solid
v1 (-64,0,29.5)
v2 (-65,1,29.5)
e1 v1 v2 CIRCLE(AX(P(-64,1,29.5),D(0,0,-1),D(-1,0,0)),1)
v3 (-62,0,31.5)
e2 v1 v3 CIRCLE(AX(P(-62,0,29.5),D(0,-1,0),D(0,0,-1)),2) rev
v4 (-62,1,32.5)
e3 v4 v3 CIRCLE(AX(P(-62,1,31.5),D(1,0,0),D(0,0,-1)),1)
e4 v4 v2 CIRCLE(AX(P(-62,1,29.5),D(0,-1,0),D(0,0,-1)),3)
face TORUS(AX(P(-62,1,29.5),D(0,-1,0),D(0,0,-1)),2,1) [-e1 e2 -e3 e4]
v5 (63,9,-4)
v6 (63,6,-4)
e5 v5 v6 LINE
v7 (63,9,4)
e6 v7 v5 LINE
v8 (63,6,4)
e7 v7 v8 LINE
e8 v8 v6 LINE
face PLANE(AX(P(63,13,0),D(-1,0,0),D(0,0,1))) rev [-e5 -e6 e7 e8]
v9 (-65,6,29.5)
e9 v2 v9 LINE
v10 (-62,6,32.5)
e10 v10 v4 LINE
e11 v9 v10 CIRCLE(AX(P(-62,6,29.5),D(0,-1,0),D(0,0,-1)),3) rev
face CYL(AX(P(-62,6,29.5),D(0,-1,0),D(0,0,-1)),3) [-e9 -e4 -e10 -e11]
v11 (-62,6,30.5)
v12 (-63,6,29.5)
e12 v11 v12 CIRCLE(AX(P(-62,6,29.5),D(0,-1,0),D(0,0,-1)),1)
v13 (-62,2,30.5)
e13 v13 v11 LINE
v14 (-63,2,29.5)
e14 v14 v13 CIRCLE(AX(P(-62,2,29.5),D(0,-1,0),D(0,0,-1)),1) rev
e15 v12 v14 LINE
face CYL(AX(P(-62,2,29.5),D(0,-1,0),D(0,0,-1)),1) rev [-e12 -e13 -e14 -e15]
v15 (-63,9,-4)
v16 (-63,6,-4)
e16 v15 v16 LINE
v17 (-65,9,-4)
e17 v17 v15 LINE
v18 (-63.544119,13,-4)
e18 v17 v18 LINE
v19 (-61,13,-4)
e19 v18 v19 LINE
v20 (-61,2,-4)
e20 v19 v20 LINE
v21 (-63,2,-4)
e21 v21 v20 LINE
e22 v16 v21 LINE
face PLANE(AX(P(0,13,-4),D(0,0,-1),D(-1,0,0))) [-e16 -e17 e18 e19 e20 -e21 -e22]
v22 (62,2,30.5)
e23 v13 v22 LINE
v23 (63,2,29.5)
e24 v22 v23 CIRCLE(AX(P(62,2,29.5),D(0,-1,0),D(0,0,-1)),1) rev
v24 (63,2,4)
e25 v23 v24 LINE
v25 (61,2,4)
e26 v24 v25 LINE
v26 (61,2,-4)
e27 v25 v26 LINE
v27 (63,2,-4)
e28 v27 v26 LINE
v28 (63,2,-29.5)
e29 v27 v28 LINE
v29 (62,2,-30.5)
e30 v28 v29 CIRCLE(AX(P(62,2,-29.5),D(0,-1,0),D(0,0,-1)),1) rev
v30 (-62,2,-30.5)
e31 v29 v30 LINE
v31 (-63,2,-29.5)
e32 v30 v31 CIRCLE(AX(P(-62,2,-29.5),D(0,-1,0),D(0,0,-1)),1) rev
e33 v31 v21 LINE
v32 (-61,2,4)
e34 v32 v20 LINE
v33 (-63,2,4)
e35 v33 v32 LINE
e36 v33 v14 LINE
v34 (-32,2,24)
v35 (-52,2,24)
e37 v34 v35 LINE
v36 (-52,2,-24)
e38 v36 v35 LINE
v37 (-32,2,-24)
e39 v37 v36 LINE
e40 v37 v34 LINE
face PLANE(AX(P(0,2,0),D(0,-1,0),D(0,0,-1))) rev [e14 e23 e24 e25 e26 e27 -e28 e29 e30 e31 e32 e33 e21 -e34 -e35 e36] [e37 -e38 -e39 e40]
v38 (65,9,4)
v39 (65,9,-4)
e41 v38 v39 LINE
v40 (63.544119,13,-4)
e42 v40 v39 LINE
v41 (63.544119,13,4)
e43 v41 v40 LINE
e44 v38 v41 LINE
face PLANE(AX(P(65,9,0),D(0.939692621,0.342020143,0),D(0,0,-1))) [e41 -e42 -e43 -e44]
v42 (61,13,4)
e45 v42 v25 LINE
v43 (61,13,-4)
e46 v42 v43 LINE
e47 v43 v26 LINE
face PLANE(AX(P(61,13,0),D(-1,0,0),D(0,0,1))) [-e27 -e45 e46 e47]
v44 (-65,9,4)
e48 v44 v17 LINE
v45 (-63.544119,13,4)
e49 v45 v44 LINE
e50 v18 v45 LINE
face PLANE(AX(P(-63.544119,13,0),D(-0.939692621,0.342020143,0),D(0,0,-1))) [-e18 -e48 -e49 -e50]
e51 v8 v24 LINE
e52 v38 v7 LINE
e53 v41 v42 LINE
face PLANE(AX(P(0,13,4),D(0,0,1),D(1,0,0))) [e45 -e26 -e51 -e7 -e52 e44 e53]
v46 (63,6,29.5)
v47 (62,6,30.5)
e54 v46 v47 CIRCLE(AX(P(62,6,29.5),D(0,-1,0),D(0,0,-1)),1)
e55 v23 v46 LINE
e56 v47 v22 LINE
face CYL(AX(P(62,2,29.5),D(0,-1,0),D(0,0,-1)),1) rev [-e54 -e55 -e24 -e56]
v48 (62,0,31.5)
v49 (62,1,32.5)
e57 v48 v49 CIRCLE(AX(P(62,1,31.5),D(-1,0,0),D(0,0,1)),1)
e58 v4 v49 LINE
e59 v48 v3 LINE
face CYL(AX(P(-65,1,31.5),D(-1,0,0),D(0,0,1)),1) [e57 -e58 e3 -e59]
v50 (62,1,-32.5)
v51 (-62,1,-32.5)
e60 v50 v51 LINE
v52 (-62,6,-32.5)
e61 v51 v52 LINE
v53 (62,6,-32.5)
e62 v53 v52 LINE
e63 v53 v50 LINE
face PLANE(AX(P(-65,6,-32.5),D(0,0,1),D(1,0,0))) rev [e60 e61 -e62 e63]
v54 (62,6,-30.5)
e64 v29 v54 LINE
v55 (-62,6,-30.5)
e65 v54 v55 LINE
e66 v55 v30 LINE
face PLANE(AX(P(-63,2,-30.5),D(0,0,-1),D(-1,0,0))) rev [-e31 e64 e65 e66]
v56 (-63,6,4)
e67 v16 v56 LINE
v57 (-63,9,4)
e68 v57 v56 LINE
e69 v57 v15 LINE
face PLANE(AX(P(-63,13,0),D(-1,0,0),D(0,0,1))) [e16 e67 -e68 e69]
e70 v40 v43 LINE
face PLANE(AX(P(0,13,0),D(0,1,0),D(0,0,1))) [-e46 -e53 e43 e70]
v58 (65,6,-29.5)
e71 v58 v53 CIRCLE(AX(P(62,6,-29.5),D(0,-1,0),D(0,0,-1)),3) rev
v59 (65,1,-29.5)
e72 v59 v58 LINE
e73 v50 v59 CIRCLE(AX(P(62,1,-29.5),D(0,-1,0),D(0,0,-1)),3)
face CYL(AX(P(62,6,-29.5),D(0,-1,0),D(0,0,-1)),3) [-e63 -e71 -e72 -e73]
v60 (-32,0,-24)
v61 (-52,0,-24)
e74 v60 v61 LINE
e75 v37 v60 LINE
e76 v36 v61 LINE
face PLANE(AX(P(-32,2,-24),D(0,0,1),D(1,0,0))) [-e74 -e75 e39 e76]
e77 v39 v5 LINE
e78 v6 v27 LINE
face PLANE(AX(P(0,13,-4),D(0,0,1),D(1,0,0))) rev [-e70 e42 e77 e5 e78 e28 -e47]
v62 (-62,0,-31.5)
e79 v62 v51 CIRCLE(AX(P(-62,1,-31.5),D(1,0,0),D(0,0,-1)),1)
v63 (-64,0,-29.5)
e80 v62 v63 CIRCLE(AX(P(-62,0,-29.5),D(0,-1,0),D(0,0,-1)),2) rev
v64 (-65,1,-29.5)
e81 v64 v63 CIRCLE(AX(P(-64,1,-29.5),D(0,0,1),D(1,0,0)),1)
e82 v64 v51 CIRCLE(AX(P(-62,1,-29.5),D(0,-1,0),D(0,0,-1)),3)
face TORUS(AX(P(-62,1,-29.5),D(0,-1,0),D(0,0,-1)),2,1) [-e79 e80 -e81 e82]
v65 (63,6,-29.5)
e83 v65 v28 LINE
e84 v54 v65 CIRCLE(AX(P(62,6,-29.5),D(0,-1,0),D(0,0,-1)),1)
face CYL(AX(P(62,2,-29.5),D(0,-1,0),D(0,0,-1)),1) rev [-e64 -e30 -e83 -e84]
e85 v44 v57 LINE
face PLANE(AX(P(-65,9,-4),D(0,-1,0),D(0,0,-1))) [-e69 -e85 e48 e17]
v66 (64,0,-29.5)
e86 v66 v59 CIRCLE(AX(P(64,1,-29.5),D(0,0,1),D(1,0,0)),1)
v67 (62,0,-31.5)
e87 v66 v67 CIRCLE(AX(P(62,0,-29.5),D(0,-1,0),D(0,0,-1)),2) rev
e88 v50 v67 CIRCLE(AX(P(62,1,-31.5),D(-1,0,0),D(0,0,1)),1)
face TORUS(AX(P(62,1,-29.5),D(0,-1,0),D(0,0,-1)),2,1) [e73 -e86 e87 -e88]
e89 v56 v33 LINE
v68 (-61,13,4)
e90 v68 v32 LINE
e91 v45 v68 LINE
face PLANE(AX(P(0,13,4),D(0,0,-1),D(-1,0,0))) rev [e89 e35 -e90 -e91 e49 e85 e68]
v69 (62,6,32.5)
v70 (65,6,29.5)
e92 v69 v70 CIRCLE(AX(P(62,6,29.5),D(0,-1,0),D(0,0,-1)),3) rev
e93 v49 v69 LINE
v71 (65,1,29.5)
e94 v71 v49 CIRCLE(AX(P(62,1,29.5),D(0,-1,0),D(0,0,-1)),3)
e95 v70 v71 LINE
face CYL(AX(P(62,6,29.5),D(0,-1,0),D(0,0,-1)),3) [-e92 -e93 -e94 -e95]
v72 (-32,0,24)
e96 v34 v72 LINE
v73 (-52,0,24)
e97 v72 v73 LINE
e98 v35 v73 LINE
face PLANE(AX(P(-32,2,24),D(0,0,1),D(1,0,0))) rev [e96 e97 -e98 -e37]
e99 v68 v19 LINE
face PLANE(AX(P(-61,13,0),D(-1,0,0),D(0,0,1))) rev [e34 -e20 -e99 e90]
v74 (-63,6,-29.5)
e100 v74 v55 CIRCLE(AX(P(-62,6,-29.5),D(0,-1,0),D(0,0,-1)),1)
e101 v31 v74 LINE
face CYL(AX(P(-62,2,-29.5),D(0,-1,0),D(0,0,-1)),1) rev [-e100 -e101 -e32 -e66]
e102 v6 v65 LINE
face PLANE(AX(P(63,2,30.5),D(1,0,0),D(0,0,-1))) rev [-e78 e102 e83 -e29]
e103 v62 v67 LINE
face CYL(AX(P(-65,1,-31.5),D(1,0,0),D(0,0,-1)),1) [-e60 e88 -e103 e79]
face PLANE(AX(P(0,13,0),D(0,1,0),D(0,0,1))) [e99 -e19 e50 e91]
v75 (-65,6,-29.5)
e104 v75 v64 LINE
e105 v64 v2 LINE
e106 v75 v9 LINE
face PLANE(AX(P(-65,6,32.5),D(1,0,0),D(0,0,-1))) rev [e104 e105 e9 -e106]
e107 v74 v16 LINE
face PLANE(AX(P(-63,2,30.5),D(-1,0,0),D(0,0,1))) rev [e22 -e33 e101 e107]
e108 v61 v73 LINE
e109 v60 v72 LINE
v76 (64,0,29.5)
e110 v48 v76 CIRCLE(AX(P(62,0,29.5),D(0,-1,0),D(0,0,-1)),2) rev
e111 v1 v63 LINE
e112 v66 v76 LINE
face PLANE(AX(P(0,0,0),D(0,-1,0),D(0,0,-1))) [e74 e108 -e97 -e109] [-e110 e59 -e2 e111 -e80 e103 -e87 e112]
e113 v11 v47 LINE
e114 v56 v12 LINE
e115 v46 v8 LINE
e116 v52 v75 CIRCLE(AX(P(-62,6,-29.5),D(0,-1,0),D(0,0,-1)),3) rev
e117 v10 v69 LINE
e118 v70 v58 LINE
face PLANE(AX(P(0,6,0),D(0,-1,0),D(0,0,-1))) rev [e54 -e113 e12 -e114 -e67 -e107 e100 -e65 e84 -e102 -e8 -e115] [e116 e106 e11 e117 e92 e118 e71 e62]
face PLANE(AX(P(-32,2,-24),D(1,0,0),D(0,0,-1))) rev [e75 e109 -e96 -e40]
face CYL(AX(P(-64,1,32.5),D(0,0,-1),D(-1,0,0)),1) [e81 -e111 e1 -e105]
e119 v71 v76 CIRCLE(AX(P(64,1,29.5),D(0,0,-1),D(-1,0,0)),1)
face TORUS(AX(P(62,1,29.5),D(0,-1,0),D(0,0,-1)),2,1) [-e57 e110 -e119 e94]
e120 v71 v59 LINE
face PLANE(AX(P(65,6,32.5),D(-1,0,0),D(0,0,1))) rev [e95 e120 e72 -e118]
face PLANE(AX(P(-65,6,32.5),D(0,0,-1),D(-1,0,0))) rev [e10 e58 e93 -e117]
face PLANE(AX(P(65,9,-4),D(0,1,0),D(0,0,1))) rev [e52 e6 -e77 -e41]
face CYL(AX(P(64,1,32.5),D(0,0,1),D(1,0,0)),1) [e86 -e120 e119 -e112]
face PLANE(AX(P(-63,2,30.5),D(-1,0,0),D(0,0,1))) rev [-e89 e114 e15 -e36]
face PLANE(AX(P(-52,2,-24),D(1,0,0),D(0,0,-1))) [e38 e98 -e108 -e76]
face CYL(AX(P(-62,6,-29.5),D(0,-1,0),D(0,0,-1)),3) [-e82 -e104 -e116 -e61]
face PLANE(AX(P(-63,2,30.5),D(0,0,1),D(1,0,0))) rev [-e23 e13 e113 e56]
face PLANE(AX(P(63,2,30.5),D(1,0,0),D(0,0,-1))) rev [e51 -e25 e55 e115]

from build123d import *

# Parameters (mm, degrees)
SKETCH_1_W                  = 130
SKETCH_1_H                  = 65
EXTRUDE_1_DEPTH             = 6
SKETCH_2_W                  = 126
SKETCH_2_H                  = 61
CUT_EXTRUDE_1_DEPTH         = 4
FILLET_1_R                  = 1
SKETCH_9_W                  = 20
SKETCH_9_H                  = 48
CUT_EXTRUDE_3_DEPTH         = 2
SKETCH_6_W                  = 2
SKETCH_6_H                  = 8
EXTRUDE_2_DEPTH             = 11
SKETCH_12_W                 = 8
SKETCH_12_H                 = 4
EXTRUDE_4_DEPTH             = 2
CHAMFER_2_SIZE2             = 4
CHAMFER_2_SIZE              = 1.455880937
CHAMFER_2_OF_MIRROR_2_SIZE2 = 1.455880937
CHAMFER_2_OF_MIRROR_2_SIZE  = 4
FILLET_2_R                  = 1
FILLET_3_R                  = 3


# Some blends are built 0.0001 mm under size
with BuildPart() as part:
    # Эскиз1 → Бобышка-Вытянуть1 (new body)
    with BuildSketch(Plane(origin=(0, 0, 0), x_dir=(1, 0, 0), z_dir=(0, 1, 0))):
        Rectangle(SKETCH_1_W, SKETCH_1_H)
    extrude(amount=EXTRUDE_1_DEPTH)

    # Эскиз2 → Вырез-Вытянуть1 (cut)
    with BuildSketch(Plane(origin=(0, 6, 0), x_dir=(1, 0, 0), z_dir=(0, 1, 0))):
        Rectangle(SKETCH_2_W, SKETCH_2_H)
    extrude(amount=-CUT_EXTRUDE_1_DEPTH, mode=Mode.SUBTRACT)

    # Скругление1
    fillet_1_edges = [part.edges().sort_by_distance(p)[0] for p in [
        (0, 0, 32.5),
        (-65, 0, 0),
        (0, 0, -32.5),
        (65, 0, 0),
    ]]
    fillet(fillet_1_edges, radius=FILLET_1_R)

    # Эскиз9 → Вырез-Вытянуть3 (cut)
    with BuildSketch(Plane.XZ):
        with Locations((-42, 0)):
            Rectangle(SKETCH_9_W, SKETCH_9_H)
    extrude(amount=-CUT_EXTRUDE_3_DEPTH, mode=Mode.SUBTRACT)

    # Эскиз6 → Бобышка-Вытянуть2 (add)
    with BuildSketch(Plane(origin=(0, 2, 0), x_dir=(1, 0, 0), z_dir=(0, 1, 0))):
        with Locations((62, 0)):
            Rectangle(SKETCH_6_W, SKETCH_6_H)
    extrude_2 = extrude(amount=EXTRUDE_2_DEPTH)

    # Эскиз12 → Бобышка-Вытянуть4 (add)
    with BuildSketch(Plane(origin=(63, 0, 0), x_dir=(0, 0, -1), z_dir=(1, 0, 0))):
        with Locations((0, 11)):
            Rectangle(SKETCH_12_W, SKETCH_12_H)
    extrude_4 = extrude(amount=EXTRUDE_4_DEPTH)

    # Фаска2
    chamfer_2_edges = [part.edges().sort_by_distance(p)[0] for p in [
        (65, 13, 0),
    ]]
    chamfer_2_side = [part.faces().sort_by_distance(p)[0] for p in [
        (64.970882381, 13, 0),
    ]]
    chamfer(chamfer_2_edges, length=CHAMFER_2_SIZE - 0.0001, length2=CHAMFER_2_SIZE2 - 0.0001, reference=chamfer_2_side[0])  # a hair under: the kernel refuses the full size

    # Зеркальное отражение2: Бобышка-Вытянуть2, Бобышка-Вытянуть4 across plane
    add(extrude_2.mirror(Plane(origin=(0, 0, 0), x_dir=(0, 0, 1), z_dir=(1, 0, 0))))
    add(extrude_4.mirror(Plane(origin=(0, 0, 0), x_dir=(0, 0, 1), z_dir=(1, 0, 0))))

    # Фаска2 of Зеркальное отражение2
    chamfer_2_of_mirror_2_edges = [part.edges().sort_by_distance(p)[0] for p in [
        (-65, 13, 0),
    ]]
    chamfer_2_of_mirror_2_side = [part.faces().sort_by_distance(p)[0] for p in [
        (-65, 12.970882381, 0),
    ]]
    chamfer(chamfer_2_of_mirror_2_edges, length=CHAMFER_2_OF_MIRROR_2_SIZE - 0.0001, length2=CHAMFER_2_OF_MIRROR_2_SIZE2 - 0.0001, reference=chamfer_2_of_mirror_2_side[0])  # a hair under: the kernel refuses the full size

    # Скругление2
    fillet_2_edges = [part.edges().sort_by_distance(p)[0] for p in [
        (63, 4, -30.5),
        (63, 4, 30.5),
        (-63, 4, 30.5),
        (-63, 4, -30.5),
    ]]
    fillet(fillet_2_edges, radius=FILLET_2_R)

    # Скругление3
    # the kernel refuses this fillet: 3 mm, written as the material it takes off along each edge
    with BuildSketch(Plane(origin=(-62, 0, 29.5), x_dir=(0, 0, 1), z_dir=(1, 0, 0))) as fillet_3_piece_1:
        with BuildLine():
            CenterArc((2, -1), 1, 0, 90)
            Line((3, -1), (3, 0))
            Line((3, 0), (2, 0))
        make_face()
    revolve(axis=Axis((-62, 0, 29.5), (0, -1, 0)), revolution_arc=90, mode=Mode.SUBTRACT)
    with BuildSketch(Plane(origin=(-62, 0, -29.5), x_dir=(-1, 0, 0), z_dir=(0, 0, 1))) as fillet_3_piece_2:
        with BuildLine():
            CenterArc((2, -1), 1, 0, 90)
            Line((3, -1), (3, 0))
            Line((3, 0), (2, 0))
        make_face()
    revolve(axis=Axis((-62, 0, -29.5), (0, -1, 0)), revolution_arc=90, mode=Mode.SUBTRACT)
    with BuildSketch(Plane(origin=(62, 0, 29.5), x_dir=(1, 0, 0), z_dir=(0, 0, -1))) as fillet_3_piece_3:
        with BuildLine():
            CenterArc((2, -1), 1, 0, 90)
            Line((3, -1), (3, 0))
            Line((3, 0), (2, 0))
        make_face()
    revolve(axis=Axis((62, 0, 29.5), (0, -1, 0)), revolution_arc=90, mode=Mode.SUBTRACT)
    with BuildSketch(Plane(origin=(62, 0, -29.5), x_dir=(0, 0, -1), z_dir=(-1, 0, 0))) as fillet_3_piece_4:
        with BuildLine():
            CenterArc((2, -1), 1, 0, 90)
            Line((3, -1), (3, 0))
            Line((3, 0), (2, 0))
        make_face()
    revolve(axis=Axis((62, 0, -29.5), (0, -1, 0)), revolution_arc=90, mode=Mode.SUBTRACT)
    with BuildSketch(Plane(origin=(65, 0, 32.5), x_dir=(-1, 0, 0), z_dir=(0, 1, 0)), Plane(origin=(65, 0, -32.5), x_dir=(0, 0, 1), z_dir=(0, 1, 0))) as fillet_3_piece_5:
        with BuildLine():
            CenterArc((FILLET_3_R, -FILLET_3_R), FILLET_3_R, 90, 90)
            Line((0, -FILLET_3_R), (0, 0))
            Line((0, 0), (FILLET_3_R, 0))
        make_face()
    extrude(amount=13.5, mode=Mode.SUBTRACT)
    with BuildSketch(Plane(origin=(-65, 0, 32.5), x_dir=(1, 0, 0), z_dir=(0, 1, 0)), Plane(origin=(-65, 0, -32.5), x_dir=(0, 0, 1), z_dir=(0, 1, 0))) as fillet_3_piece_6:
        with BuildLine():
            CenterArc((FILLET_3_R, FILLET_3_R), FILLET_3_R, 180, 90)
            Line((0, FILLET_3_R), (0, 0))
            Line((0, 0), (FILLET_3_R, 0))
        make_face()
    extrude(amount=13.5, mode=Mode.SUBTRACT)


solid = part.part
